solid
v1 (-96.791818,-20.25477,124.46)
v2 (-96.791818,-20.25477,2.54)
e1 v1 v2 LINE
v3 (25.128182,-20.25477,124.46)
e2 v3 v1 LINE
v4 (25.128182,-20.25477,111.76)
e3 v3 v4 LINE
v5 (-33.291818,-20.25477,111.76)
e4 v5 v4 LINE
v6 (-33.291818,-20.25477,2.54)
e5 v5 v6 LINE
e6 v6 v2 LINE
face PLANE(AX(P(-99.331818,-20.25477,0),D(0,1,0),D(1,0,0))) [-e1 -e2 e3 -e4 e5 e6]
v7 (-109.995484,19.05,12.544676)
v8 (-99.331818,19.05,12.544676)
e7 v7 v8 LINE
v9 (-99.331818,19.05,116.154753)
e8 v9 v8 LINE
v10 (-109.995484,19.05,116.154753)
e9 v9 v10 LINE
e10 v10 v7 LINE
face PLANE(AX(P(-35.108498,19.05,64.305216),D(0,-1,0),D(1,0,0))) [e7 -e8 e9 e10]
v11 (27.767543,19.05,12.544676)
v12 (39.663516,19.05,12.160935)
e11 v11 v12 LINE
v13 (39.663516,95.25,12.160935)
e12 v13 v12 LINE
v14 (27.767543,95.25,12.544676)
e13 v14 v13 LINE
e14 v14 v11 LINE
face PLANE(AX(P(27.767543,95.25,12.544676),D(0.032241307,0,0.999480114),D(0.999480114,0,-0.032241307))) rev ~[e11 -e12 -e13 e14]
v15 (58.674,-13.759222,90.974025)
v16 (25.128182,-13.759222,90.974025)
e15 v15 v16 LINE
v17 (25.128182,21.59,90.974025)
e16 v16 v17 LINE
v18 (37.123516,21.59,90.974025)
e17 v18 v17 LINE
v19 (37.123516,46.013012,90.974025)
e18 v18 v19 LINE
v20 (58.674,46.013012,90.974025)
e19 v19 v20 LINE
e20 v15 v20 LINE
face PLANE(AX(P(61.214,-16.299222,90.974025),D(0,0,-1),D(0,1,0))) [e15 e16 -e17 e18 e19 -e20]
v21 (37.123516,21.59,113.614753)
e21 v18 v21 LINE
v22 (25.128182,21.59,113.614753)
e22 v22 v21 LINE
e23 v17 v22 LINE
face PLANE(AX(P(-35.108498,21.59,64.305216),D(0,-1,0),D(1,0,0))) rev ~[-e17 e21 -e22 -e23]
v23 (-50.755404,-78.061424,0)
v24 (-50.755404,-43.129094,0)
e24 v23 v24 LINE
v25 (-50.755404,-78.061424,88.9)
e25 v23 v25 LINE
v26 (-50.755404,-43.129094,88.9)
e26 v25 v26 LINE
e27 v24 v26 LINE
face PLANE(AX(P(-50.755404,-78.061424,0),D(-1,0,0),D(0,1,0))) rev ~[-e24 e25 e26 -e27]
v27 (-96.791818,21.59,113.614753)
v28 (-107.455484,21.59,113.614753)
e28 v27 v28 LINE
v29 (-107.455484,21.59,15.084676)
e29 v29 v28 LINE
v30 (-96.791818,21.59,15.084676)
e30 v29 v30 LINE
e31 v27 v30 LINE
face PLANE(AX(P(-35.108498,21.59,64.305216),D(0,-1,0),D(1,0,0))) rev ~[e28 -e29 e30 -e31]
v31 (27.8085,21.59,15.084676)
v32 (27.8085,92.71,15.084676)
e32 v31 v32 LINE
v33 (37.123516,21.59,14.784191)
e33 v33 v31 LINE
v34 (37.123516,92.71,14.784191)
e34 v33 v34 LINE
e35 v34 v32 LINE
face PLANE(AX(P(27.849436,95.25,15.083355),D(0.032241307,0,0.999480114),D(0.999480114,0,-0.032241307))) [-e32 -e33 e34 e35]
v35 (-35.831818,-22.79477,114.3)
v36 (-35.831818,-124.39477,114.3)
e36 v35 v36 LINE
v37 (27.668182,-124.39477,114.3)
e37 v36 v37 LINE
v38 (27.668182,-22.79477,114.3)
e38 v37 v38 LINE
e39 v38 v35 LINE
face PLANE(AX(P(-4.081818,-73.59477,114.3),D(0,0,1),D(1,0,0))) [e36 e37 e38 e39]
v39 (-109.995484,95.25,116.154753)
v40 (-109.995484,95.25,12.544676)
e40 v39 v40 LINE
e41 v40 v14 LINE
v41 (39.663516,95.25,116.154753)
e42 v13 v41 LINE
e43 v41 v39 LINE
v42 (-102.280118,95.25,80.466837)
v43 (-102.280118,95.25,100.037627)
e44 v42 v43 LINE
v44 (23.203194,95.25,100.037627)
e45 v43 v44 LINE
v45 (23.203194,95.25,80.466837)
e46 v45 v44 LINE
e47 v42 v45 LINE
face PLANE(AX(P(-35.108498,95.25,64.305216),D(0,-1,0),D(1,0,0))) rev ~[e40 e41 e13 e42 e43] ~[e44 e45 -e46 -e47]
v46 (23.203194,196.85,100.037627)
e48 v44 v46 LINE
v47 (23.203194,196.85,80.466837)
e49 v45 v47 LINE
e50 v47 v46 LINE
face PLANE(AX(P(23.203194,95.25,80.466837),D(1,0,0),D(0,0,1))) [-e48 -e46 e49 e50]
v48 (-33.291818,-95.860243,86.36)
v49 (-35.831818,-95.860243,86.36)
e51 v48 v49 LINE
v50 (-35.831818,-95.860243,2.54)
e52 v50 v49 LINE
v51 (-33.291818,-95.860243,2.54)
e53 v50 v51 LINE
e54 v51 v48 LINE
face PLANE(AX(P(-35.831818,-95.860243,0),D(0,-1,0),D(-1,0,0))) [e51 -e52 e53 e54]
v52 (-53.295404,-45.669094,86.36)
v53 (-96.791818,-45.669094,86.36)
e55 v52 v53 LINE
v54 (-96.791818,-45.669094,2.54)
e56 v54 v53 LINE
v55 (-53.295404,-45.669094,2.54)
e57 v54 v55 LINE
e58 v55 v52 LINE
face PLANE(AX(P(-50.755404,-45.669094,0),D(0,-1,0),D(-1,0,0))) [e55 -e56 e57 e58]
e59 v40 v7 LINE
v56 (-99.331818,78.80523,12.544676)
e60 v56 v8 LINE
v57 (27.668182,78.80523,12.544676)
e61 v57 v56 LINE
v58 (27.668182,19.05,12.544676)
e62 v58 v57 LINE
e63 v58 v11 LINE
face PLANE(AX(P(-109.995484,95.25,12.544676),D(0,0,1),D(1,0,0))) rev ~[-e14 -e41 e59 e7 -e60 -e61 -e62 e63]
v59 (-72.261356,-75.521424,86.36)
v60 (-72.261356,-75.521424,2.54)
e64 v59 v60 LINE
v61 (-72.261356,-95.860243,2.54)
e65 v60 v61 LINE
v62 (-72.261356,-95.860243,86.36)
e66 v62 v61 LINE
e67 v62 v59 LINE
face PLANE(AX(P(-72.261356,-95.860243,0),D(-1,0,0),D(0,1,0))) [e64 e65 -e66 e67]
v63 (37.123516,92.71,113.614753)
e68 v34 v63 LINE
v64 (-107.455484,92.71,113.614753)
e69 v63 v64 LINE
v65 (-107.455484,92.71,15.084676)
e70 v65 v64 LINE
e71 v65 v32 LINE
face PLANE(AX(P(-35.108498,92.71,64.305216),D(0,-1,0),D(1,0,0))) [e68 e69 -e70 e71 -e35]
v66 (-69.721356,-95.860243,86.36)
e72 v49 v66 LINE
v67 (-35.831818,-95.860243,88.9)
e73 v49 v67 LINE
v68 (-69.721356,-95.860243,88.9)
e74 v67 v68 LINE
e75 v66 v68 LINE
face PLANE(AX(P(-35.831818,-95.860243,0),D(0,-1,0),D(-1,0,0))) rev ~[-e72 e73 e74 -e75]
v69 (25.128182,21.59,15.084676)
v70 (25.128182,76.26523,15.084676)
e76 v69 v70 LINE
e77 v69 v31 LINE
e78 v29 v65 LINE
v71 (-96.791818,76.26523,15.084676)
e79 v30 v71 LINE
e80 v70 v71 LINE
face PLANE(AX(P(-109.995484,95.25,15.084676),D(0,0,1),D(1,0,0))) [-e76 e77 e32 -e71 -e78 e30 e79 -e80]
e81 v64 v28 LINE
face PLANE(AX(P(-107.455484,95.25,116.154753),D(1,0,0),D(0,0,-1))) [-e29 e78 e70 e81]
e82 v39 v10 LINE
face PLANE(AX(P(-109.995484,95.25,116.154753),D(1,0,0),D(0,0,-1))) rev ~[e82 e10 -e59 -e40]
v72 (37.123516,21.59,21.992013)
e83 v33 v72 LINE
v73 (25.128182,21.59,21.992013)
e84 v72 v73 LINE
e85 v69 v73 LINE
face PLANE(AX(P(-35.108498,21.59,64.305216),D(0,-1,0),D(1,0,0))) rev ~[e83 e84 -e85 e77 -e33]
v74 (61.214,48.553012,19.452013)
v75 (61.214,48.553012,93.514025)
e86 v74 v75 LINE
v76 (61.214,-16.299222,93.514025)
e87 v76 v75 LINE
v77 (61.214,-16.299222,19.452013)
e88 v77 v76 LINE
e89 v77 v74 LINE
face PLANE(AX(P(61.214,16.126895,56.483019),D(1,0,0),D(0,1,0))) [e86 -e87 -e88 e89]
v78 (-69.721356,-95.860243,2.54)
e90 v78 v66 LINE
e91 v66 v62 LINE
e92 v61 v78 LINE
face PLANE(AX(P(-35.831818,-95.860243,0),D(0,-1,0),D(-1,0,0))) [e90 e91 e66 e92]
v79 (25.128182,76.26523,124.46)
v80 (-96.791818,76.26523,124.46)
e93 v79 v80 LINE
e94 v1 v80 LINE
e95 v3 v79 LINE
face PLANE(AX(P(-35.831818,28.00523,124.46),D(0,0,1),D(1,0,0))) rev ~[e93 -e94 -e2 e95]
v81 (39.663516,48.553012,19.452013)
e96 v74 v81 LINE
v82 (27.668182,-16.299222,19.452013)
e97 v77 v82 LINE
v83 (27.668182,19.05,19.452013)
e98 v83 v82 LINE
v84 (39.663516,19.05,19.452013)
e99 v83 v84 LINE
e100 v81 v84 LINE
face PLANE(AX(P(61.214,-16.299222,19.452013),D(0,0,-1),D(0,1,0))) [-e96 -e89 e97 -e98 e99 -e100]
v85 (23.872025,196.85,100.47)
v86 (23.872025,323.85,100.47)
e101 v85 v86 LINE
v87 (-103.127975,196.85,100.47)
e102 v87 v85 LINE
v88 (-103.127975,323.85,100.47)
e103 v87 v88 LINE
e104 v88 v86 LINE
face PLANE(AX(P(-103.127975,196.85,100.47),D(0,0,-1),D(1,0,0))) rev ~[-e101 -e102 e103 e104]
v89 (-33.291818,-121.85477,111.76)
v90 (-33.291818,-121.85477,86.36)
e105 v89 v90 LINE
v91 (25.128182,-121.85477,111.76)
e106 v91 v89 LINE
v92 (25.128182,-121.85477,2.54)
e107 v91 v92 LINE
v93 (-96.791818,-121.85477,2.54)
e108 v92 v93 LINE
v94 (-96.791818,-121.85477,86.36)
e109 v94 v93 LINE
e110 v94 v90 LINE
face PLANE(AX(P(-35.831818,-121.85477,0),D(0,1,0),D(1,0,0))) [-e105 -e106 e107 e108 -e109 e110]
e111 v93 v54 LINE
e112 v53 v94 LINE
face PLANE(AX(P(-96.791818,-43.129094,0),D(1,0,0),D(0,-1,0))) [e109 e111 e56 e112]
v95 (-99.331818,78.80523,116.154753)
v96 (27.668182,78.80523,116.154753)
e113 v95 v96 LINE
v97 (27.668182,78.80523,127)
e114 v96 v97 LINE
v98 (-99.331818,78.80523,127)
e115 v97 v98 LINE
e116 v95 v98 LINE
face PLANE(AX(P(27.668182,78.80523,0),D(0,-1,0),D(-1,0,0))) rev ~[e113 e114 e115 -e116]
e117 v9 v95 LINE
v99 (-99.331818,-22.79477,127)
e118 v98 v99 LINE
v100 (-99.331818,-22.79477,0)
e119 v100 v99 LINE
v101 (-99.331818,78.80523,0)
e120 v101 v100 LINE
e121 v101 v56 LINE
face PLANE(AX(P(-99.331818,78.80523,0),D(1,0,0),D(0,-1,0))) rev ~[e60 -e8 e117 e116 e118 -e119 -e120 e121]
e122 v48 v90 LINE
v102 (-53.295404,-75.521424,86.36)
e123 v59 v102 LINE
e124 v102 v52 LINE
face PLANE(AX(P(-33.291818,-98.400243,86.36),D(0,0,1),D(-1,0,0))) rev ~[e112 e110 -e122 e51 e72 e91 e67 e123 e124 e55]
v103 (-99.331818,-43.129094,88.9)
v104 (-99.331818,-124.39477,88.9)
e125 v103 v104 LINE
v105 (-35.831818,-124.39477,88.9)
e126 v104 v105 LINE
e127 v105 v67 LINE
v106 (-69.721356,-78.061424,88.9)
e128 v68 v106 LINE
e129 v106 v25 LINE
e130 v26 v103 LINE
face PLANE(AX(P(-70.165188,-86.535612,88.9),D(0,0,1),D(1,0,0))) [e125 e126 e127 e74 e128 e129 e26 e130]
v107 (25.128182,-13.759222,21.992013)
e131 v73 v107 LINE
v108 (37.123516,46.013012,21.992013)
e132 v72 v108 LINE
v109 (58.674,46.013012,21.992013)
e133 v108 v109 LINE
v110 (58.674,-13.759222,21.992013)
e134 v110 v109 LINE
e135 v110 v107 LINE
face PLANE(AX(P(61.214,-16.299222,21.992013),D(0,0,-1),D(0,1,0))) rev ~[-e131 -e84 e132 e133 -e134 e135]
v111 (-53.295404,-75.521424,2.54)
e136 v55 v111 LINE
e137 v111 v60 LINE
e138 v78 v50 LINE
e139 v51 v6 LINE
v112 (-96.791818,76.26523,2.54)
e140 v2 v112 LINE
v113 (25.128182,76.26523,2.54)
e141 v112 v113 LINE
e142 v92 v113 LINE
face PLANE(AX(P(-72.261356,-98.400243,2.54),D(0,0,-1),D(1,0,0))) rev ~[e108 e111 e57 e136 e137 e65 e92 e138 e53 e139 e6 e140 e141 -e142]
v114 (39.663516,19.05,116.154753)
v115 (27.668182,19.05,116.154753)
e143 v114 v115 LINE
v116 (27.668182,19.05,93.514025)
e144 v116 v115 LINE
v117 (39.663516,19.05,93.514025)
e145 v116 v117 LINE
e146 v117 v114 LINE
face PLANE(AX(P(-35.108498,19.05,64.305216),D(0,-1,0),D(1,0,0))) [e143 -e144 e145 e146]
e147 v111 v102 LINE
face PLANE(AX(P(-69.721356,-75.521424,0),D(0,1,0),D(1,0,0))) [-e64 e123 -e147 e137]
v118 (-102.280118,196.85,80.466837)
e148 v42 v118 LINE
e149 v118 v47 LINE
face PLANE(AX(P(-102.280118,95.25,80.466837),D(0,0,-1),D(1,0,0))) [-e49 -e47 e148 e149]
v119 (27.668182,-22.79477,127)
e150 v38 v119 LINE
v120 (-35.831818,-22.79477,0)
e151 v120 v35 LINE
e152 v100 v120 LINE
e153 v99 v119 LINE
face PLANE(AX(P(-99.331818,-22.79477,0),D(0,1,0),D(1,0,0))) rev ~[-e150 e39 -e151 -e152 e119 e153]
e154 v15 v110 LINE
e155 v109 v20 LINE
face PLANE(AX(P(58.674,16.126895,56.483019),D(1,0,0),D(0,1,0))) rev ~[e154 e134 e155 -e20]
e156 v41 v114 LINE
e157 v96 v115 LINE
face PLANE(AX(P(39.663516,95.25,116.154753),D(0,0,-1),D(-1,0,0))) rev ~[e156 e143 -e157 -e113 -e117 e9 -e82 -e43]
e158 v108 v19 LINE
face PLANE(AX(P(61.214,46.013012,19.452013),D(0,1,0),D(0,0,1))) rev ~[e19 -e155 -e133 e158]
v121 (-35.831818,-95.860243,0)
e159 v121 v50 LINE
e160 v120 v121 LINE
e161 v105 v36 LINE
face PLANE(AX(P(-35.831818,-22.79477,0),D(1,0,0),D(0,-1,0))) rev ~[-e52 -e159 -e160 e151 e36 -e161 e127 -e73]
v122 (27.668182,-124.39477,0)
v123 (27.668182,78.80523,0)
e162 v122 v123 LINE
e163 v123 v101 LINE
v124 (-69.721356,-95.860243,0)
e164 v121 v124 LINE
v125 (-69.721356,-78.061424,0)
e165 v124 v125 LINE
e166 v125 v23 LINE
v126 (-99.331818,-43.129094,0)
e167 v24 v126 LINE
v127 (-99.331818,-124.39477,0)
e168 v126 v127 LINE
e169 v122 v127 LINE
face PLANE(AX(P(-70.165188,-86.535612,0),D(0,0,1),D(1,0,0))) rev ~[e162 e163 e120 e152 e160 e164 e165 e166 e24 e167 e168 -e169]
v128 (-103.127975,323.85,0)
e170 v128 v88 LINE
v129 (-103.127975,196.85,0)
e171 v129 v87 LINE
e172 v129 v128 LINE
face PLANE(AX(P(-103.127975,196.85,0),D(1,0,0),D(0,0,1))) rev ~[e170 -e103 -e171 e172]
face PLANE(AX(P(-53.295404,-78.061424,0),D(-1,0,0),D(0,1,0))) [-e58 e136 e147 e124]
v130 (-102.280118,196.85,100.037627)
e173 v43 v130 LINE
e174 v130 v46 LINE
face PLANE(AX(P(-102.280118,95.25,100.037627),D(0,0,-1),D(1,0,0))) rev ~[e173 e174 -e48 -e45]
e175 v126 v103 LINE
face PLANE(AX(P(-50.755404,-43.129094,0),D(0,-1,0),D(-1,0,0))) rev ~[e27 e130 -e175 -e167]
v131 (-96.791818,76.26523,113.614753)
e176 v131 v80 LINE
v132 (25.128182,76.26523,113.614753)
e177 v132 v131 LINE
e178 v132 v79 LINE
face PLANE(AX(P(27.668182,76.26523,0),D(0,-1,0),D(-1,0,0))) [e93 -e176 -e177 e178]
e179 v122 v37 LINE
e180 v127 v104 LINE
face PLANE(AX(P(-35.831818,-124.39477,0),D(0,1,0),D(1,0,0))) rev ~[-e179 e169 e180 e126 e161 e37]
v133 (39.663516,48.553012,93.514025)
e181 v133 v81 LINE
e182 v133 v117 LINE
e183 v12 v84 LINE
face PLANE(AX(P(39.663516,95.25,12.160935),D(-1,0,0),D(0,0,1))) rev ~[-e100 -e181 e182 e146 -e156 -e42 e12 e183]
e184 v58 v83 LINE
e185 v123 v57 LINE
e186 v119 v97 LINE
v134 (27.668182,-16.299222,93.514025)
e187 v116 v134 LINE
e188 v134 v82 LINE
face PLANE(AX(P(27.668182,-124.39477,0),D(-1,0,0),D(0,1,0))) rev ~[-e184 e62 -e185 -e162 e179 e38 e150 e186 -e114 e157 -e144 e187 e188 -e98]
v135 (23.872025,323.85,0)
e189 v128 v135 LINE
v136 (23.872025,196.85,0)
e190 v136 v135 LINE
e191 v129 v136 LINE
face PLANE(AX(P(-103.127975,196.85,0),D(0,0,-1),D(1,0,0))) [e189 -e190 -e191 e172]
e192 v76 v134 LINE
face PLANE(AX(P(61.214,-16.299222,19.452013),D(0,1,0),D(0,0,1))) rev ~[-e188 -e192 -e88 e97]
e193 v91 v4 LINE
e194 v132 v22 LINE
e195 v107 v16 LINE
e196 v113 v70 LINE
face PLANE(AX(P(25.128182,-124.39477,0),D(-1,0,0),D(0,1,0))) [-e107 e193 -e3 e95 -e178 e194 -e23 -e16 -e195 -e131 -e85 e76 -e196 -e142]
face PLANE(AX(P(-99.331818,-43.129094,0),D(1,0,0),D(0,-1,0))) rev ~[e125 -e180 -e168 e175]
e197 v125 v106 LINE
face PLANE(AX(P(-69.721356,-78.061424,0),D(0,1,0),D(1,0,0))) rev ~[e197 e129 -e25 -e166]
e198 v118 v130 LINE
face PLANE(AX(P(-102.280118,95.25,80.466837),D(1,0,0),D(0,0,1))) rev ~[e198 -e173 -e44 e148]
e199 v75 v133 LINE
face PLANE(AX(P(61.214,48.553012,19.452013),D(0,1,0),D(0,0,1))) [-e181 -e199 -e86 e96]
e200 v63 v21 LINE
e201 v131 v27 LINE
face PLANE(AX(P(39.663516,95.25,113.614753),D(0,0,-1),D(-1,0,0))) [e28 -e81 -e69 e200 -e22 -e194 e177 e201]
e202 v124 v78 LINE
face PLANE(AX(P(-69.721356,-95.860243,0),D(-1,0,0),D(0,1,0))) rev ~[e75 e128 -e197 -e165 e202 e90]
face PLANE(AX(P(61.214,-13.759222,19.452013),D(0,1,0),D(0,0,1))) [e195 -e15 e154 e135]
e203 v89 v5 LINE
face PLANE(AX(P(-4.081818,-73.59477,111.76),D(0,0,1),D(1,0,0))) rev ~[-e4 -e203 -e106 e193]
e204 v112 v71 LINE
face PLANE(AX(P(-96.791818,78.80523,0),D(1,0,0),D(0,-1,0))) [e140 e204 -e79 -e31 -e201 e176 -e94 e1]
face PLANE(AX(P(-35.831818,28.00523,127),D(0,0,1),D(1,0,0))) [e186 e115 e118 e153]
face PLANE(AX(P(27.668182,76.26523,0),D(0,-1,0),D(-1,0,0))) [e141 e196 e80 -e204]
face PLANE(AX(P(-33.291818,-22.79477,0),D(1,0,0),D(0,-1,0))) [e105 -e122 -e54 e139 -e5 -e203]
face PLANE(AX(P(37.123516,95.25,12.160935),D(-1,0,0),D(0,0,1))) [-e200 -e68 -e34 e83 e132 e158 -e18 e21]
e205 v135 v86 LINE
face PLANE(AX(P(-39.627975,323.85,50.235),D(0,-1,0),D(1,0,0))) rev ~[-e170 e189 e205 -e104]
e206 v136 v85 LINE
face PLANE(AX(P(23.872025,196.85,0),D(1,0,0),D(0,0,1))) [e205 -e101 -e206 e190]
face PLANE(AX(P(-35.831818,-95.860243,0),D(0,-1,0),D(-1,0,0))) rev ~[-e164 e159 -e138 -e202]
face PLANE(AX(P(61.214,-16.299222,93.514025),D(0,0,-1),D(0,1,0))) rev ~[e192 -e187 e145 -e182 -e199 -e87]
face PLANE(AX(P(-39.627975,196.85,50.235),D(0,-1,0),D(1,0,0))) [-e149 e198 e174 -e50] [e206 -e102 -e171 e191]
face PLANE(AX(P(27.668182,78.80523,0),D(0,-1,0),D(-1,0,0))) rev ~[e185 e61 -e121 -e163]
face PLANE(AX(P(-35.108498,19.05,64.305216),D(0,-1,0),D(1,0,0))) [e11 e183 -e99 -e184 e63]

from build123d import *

# Parameters (mm, degrees)
F1_DEPTH  = 127
F2_DEPTH  = 114.3
F3_DEPTH  = 88.9
F6_DEPTH  = 76.2
F8_W      = 64.8522339761
F8_H      = 74.062012136
F9_DEPTH  = 38.1
F10_T     = -2.54
F11_W     = 125.4833117127
F11_H     = 19.5707902312
F12_DEPTH = 101.6
F14_W     = 127
F14_H     = 100.4699997724
F15_DEPTH = 127


# Not quite as in the source:
# - a shell that OpenCascade refuses in one call is made with other operations: the cavity is built on its own and cut out


with BuildPart() as f1:
    # F0 (on Top) → F1 (new body)
    with BuildSketch(Plane.XY):
        Polygon((27.6681821086, 78.8052295411), (-99.3318178914, 78.8052295411), (-99.3318178914, -22.7947704589), (-35.8318178914, -22.7947704589), (27.6681821086, -22.7947704589), align=None)
    extrude(amount=F1_DEPTH)

    # F0 (on Top) → F2 (join)
    with BuildSketch(Plane.XY):
        Polygon((27.6681821086, -124.3947704589), (27.6681821086, -22.7947704589), (-35.8318178914, -22.7947704589), (-35.8318178914, -95.8602428436), (-35.8318178914, -124.3947704589), align=None)
    extrude(amount=F2_DEPTH)

    # F0 (on Top) → F3 (join)
    with BuildSketch(Plane.XY):
        Polygon((-35.8318178914, -124.3947704589), (-35.8318178914, -95.8602428436), (-69.7213560343, -95.8602428436), (-69.7213560343, -85.9395861626), (-69.7213560343, -78.0614241958), (-50.7554039359, -78.0614241958), (-50.7554039359, -43.129093945), (-99.3318178914, -43.129093945), (-99.3318178914, -124.3947704589), align=None)
    extrude(amount=F3_DEPTH)

    # F5 (on offset) → F6 (join)
    with BuildSketch(Plane.XZ.offset(-95.25)):
        Polygon((-109.9954843521, 12.5446757302), (27.7675427496, 12.5446757302), (39.663515985, 12.1609345078), (39.663515985, 116.1547526717), (-109.9954843521, 116.1547526717), align=None)
    extrude(amount=F6_DEPTH)

    # F8 (on offset) → F9 (join)
    with BuildSketch(Plane.YZ.offset(61.214)):
        with Locations((16.1268953234, 56.4830191433)):
            Rectangle(F8_W, F8_H)
    extrude(amount=-F9_DEPTH)

    # F10: a shell. OpenCascade refuses it in one call, so the cavity is built on its own and cut out:
    # the body offset inwards by the wall thickness, plus a prism from it out through each open face.
    f10_core = offset(f1.part, amount=F10_T, kind=Kind.INTERSECTION, mode=Mode.PRIVATE)
    f10_exits = [f10_core.faces().sort_by_distance(p)[0] for p in [
        (-52.776587, -98.400243, 44.45),
    ]]
    add(f10_core, mode=Mode.SUBTRACT)
    extrude(f10_exits, amount=-F10_T, mode=Mode.SUBTRACT)

    # F11 (on offset) → F12 (join)
    with BuildSketch(Plane.XZ.offset(-95.25)):
        with Locations((-39.538461715, 90.2522318065)):
            Rectangle(F11_W, F11_H)
    extrude(amount=-F12_DEPTH)

    # F14 (on offset) → F15 (join)
    with BuildSketch(Plane.XZ.offset(-196.85)):
        with Locations((-39.6279752942, 50.2349998862)):
            Rectangle(F14_W, F14_H)
    extrude(amount=-F15_DEPTH)


solid = f1.part
